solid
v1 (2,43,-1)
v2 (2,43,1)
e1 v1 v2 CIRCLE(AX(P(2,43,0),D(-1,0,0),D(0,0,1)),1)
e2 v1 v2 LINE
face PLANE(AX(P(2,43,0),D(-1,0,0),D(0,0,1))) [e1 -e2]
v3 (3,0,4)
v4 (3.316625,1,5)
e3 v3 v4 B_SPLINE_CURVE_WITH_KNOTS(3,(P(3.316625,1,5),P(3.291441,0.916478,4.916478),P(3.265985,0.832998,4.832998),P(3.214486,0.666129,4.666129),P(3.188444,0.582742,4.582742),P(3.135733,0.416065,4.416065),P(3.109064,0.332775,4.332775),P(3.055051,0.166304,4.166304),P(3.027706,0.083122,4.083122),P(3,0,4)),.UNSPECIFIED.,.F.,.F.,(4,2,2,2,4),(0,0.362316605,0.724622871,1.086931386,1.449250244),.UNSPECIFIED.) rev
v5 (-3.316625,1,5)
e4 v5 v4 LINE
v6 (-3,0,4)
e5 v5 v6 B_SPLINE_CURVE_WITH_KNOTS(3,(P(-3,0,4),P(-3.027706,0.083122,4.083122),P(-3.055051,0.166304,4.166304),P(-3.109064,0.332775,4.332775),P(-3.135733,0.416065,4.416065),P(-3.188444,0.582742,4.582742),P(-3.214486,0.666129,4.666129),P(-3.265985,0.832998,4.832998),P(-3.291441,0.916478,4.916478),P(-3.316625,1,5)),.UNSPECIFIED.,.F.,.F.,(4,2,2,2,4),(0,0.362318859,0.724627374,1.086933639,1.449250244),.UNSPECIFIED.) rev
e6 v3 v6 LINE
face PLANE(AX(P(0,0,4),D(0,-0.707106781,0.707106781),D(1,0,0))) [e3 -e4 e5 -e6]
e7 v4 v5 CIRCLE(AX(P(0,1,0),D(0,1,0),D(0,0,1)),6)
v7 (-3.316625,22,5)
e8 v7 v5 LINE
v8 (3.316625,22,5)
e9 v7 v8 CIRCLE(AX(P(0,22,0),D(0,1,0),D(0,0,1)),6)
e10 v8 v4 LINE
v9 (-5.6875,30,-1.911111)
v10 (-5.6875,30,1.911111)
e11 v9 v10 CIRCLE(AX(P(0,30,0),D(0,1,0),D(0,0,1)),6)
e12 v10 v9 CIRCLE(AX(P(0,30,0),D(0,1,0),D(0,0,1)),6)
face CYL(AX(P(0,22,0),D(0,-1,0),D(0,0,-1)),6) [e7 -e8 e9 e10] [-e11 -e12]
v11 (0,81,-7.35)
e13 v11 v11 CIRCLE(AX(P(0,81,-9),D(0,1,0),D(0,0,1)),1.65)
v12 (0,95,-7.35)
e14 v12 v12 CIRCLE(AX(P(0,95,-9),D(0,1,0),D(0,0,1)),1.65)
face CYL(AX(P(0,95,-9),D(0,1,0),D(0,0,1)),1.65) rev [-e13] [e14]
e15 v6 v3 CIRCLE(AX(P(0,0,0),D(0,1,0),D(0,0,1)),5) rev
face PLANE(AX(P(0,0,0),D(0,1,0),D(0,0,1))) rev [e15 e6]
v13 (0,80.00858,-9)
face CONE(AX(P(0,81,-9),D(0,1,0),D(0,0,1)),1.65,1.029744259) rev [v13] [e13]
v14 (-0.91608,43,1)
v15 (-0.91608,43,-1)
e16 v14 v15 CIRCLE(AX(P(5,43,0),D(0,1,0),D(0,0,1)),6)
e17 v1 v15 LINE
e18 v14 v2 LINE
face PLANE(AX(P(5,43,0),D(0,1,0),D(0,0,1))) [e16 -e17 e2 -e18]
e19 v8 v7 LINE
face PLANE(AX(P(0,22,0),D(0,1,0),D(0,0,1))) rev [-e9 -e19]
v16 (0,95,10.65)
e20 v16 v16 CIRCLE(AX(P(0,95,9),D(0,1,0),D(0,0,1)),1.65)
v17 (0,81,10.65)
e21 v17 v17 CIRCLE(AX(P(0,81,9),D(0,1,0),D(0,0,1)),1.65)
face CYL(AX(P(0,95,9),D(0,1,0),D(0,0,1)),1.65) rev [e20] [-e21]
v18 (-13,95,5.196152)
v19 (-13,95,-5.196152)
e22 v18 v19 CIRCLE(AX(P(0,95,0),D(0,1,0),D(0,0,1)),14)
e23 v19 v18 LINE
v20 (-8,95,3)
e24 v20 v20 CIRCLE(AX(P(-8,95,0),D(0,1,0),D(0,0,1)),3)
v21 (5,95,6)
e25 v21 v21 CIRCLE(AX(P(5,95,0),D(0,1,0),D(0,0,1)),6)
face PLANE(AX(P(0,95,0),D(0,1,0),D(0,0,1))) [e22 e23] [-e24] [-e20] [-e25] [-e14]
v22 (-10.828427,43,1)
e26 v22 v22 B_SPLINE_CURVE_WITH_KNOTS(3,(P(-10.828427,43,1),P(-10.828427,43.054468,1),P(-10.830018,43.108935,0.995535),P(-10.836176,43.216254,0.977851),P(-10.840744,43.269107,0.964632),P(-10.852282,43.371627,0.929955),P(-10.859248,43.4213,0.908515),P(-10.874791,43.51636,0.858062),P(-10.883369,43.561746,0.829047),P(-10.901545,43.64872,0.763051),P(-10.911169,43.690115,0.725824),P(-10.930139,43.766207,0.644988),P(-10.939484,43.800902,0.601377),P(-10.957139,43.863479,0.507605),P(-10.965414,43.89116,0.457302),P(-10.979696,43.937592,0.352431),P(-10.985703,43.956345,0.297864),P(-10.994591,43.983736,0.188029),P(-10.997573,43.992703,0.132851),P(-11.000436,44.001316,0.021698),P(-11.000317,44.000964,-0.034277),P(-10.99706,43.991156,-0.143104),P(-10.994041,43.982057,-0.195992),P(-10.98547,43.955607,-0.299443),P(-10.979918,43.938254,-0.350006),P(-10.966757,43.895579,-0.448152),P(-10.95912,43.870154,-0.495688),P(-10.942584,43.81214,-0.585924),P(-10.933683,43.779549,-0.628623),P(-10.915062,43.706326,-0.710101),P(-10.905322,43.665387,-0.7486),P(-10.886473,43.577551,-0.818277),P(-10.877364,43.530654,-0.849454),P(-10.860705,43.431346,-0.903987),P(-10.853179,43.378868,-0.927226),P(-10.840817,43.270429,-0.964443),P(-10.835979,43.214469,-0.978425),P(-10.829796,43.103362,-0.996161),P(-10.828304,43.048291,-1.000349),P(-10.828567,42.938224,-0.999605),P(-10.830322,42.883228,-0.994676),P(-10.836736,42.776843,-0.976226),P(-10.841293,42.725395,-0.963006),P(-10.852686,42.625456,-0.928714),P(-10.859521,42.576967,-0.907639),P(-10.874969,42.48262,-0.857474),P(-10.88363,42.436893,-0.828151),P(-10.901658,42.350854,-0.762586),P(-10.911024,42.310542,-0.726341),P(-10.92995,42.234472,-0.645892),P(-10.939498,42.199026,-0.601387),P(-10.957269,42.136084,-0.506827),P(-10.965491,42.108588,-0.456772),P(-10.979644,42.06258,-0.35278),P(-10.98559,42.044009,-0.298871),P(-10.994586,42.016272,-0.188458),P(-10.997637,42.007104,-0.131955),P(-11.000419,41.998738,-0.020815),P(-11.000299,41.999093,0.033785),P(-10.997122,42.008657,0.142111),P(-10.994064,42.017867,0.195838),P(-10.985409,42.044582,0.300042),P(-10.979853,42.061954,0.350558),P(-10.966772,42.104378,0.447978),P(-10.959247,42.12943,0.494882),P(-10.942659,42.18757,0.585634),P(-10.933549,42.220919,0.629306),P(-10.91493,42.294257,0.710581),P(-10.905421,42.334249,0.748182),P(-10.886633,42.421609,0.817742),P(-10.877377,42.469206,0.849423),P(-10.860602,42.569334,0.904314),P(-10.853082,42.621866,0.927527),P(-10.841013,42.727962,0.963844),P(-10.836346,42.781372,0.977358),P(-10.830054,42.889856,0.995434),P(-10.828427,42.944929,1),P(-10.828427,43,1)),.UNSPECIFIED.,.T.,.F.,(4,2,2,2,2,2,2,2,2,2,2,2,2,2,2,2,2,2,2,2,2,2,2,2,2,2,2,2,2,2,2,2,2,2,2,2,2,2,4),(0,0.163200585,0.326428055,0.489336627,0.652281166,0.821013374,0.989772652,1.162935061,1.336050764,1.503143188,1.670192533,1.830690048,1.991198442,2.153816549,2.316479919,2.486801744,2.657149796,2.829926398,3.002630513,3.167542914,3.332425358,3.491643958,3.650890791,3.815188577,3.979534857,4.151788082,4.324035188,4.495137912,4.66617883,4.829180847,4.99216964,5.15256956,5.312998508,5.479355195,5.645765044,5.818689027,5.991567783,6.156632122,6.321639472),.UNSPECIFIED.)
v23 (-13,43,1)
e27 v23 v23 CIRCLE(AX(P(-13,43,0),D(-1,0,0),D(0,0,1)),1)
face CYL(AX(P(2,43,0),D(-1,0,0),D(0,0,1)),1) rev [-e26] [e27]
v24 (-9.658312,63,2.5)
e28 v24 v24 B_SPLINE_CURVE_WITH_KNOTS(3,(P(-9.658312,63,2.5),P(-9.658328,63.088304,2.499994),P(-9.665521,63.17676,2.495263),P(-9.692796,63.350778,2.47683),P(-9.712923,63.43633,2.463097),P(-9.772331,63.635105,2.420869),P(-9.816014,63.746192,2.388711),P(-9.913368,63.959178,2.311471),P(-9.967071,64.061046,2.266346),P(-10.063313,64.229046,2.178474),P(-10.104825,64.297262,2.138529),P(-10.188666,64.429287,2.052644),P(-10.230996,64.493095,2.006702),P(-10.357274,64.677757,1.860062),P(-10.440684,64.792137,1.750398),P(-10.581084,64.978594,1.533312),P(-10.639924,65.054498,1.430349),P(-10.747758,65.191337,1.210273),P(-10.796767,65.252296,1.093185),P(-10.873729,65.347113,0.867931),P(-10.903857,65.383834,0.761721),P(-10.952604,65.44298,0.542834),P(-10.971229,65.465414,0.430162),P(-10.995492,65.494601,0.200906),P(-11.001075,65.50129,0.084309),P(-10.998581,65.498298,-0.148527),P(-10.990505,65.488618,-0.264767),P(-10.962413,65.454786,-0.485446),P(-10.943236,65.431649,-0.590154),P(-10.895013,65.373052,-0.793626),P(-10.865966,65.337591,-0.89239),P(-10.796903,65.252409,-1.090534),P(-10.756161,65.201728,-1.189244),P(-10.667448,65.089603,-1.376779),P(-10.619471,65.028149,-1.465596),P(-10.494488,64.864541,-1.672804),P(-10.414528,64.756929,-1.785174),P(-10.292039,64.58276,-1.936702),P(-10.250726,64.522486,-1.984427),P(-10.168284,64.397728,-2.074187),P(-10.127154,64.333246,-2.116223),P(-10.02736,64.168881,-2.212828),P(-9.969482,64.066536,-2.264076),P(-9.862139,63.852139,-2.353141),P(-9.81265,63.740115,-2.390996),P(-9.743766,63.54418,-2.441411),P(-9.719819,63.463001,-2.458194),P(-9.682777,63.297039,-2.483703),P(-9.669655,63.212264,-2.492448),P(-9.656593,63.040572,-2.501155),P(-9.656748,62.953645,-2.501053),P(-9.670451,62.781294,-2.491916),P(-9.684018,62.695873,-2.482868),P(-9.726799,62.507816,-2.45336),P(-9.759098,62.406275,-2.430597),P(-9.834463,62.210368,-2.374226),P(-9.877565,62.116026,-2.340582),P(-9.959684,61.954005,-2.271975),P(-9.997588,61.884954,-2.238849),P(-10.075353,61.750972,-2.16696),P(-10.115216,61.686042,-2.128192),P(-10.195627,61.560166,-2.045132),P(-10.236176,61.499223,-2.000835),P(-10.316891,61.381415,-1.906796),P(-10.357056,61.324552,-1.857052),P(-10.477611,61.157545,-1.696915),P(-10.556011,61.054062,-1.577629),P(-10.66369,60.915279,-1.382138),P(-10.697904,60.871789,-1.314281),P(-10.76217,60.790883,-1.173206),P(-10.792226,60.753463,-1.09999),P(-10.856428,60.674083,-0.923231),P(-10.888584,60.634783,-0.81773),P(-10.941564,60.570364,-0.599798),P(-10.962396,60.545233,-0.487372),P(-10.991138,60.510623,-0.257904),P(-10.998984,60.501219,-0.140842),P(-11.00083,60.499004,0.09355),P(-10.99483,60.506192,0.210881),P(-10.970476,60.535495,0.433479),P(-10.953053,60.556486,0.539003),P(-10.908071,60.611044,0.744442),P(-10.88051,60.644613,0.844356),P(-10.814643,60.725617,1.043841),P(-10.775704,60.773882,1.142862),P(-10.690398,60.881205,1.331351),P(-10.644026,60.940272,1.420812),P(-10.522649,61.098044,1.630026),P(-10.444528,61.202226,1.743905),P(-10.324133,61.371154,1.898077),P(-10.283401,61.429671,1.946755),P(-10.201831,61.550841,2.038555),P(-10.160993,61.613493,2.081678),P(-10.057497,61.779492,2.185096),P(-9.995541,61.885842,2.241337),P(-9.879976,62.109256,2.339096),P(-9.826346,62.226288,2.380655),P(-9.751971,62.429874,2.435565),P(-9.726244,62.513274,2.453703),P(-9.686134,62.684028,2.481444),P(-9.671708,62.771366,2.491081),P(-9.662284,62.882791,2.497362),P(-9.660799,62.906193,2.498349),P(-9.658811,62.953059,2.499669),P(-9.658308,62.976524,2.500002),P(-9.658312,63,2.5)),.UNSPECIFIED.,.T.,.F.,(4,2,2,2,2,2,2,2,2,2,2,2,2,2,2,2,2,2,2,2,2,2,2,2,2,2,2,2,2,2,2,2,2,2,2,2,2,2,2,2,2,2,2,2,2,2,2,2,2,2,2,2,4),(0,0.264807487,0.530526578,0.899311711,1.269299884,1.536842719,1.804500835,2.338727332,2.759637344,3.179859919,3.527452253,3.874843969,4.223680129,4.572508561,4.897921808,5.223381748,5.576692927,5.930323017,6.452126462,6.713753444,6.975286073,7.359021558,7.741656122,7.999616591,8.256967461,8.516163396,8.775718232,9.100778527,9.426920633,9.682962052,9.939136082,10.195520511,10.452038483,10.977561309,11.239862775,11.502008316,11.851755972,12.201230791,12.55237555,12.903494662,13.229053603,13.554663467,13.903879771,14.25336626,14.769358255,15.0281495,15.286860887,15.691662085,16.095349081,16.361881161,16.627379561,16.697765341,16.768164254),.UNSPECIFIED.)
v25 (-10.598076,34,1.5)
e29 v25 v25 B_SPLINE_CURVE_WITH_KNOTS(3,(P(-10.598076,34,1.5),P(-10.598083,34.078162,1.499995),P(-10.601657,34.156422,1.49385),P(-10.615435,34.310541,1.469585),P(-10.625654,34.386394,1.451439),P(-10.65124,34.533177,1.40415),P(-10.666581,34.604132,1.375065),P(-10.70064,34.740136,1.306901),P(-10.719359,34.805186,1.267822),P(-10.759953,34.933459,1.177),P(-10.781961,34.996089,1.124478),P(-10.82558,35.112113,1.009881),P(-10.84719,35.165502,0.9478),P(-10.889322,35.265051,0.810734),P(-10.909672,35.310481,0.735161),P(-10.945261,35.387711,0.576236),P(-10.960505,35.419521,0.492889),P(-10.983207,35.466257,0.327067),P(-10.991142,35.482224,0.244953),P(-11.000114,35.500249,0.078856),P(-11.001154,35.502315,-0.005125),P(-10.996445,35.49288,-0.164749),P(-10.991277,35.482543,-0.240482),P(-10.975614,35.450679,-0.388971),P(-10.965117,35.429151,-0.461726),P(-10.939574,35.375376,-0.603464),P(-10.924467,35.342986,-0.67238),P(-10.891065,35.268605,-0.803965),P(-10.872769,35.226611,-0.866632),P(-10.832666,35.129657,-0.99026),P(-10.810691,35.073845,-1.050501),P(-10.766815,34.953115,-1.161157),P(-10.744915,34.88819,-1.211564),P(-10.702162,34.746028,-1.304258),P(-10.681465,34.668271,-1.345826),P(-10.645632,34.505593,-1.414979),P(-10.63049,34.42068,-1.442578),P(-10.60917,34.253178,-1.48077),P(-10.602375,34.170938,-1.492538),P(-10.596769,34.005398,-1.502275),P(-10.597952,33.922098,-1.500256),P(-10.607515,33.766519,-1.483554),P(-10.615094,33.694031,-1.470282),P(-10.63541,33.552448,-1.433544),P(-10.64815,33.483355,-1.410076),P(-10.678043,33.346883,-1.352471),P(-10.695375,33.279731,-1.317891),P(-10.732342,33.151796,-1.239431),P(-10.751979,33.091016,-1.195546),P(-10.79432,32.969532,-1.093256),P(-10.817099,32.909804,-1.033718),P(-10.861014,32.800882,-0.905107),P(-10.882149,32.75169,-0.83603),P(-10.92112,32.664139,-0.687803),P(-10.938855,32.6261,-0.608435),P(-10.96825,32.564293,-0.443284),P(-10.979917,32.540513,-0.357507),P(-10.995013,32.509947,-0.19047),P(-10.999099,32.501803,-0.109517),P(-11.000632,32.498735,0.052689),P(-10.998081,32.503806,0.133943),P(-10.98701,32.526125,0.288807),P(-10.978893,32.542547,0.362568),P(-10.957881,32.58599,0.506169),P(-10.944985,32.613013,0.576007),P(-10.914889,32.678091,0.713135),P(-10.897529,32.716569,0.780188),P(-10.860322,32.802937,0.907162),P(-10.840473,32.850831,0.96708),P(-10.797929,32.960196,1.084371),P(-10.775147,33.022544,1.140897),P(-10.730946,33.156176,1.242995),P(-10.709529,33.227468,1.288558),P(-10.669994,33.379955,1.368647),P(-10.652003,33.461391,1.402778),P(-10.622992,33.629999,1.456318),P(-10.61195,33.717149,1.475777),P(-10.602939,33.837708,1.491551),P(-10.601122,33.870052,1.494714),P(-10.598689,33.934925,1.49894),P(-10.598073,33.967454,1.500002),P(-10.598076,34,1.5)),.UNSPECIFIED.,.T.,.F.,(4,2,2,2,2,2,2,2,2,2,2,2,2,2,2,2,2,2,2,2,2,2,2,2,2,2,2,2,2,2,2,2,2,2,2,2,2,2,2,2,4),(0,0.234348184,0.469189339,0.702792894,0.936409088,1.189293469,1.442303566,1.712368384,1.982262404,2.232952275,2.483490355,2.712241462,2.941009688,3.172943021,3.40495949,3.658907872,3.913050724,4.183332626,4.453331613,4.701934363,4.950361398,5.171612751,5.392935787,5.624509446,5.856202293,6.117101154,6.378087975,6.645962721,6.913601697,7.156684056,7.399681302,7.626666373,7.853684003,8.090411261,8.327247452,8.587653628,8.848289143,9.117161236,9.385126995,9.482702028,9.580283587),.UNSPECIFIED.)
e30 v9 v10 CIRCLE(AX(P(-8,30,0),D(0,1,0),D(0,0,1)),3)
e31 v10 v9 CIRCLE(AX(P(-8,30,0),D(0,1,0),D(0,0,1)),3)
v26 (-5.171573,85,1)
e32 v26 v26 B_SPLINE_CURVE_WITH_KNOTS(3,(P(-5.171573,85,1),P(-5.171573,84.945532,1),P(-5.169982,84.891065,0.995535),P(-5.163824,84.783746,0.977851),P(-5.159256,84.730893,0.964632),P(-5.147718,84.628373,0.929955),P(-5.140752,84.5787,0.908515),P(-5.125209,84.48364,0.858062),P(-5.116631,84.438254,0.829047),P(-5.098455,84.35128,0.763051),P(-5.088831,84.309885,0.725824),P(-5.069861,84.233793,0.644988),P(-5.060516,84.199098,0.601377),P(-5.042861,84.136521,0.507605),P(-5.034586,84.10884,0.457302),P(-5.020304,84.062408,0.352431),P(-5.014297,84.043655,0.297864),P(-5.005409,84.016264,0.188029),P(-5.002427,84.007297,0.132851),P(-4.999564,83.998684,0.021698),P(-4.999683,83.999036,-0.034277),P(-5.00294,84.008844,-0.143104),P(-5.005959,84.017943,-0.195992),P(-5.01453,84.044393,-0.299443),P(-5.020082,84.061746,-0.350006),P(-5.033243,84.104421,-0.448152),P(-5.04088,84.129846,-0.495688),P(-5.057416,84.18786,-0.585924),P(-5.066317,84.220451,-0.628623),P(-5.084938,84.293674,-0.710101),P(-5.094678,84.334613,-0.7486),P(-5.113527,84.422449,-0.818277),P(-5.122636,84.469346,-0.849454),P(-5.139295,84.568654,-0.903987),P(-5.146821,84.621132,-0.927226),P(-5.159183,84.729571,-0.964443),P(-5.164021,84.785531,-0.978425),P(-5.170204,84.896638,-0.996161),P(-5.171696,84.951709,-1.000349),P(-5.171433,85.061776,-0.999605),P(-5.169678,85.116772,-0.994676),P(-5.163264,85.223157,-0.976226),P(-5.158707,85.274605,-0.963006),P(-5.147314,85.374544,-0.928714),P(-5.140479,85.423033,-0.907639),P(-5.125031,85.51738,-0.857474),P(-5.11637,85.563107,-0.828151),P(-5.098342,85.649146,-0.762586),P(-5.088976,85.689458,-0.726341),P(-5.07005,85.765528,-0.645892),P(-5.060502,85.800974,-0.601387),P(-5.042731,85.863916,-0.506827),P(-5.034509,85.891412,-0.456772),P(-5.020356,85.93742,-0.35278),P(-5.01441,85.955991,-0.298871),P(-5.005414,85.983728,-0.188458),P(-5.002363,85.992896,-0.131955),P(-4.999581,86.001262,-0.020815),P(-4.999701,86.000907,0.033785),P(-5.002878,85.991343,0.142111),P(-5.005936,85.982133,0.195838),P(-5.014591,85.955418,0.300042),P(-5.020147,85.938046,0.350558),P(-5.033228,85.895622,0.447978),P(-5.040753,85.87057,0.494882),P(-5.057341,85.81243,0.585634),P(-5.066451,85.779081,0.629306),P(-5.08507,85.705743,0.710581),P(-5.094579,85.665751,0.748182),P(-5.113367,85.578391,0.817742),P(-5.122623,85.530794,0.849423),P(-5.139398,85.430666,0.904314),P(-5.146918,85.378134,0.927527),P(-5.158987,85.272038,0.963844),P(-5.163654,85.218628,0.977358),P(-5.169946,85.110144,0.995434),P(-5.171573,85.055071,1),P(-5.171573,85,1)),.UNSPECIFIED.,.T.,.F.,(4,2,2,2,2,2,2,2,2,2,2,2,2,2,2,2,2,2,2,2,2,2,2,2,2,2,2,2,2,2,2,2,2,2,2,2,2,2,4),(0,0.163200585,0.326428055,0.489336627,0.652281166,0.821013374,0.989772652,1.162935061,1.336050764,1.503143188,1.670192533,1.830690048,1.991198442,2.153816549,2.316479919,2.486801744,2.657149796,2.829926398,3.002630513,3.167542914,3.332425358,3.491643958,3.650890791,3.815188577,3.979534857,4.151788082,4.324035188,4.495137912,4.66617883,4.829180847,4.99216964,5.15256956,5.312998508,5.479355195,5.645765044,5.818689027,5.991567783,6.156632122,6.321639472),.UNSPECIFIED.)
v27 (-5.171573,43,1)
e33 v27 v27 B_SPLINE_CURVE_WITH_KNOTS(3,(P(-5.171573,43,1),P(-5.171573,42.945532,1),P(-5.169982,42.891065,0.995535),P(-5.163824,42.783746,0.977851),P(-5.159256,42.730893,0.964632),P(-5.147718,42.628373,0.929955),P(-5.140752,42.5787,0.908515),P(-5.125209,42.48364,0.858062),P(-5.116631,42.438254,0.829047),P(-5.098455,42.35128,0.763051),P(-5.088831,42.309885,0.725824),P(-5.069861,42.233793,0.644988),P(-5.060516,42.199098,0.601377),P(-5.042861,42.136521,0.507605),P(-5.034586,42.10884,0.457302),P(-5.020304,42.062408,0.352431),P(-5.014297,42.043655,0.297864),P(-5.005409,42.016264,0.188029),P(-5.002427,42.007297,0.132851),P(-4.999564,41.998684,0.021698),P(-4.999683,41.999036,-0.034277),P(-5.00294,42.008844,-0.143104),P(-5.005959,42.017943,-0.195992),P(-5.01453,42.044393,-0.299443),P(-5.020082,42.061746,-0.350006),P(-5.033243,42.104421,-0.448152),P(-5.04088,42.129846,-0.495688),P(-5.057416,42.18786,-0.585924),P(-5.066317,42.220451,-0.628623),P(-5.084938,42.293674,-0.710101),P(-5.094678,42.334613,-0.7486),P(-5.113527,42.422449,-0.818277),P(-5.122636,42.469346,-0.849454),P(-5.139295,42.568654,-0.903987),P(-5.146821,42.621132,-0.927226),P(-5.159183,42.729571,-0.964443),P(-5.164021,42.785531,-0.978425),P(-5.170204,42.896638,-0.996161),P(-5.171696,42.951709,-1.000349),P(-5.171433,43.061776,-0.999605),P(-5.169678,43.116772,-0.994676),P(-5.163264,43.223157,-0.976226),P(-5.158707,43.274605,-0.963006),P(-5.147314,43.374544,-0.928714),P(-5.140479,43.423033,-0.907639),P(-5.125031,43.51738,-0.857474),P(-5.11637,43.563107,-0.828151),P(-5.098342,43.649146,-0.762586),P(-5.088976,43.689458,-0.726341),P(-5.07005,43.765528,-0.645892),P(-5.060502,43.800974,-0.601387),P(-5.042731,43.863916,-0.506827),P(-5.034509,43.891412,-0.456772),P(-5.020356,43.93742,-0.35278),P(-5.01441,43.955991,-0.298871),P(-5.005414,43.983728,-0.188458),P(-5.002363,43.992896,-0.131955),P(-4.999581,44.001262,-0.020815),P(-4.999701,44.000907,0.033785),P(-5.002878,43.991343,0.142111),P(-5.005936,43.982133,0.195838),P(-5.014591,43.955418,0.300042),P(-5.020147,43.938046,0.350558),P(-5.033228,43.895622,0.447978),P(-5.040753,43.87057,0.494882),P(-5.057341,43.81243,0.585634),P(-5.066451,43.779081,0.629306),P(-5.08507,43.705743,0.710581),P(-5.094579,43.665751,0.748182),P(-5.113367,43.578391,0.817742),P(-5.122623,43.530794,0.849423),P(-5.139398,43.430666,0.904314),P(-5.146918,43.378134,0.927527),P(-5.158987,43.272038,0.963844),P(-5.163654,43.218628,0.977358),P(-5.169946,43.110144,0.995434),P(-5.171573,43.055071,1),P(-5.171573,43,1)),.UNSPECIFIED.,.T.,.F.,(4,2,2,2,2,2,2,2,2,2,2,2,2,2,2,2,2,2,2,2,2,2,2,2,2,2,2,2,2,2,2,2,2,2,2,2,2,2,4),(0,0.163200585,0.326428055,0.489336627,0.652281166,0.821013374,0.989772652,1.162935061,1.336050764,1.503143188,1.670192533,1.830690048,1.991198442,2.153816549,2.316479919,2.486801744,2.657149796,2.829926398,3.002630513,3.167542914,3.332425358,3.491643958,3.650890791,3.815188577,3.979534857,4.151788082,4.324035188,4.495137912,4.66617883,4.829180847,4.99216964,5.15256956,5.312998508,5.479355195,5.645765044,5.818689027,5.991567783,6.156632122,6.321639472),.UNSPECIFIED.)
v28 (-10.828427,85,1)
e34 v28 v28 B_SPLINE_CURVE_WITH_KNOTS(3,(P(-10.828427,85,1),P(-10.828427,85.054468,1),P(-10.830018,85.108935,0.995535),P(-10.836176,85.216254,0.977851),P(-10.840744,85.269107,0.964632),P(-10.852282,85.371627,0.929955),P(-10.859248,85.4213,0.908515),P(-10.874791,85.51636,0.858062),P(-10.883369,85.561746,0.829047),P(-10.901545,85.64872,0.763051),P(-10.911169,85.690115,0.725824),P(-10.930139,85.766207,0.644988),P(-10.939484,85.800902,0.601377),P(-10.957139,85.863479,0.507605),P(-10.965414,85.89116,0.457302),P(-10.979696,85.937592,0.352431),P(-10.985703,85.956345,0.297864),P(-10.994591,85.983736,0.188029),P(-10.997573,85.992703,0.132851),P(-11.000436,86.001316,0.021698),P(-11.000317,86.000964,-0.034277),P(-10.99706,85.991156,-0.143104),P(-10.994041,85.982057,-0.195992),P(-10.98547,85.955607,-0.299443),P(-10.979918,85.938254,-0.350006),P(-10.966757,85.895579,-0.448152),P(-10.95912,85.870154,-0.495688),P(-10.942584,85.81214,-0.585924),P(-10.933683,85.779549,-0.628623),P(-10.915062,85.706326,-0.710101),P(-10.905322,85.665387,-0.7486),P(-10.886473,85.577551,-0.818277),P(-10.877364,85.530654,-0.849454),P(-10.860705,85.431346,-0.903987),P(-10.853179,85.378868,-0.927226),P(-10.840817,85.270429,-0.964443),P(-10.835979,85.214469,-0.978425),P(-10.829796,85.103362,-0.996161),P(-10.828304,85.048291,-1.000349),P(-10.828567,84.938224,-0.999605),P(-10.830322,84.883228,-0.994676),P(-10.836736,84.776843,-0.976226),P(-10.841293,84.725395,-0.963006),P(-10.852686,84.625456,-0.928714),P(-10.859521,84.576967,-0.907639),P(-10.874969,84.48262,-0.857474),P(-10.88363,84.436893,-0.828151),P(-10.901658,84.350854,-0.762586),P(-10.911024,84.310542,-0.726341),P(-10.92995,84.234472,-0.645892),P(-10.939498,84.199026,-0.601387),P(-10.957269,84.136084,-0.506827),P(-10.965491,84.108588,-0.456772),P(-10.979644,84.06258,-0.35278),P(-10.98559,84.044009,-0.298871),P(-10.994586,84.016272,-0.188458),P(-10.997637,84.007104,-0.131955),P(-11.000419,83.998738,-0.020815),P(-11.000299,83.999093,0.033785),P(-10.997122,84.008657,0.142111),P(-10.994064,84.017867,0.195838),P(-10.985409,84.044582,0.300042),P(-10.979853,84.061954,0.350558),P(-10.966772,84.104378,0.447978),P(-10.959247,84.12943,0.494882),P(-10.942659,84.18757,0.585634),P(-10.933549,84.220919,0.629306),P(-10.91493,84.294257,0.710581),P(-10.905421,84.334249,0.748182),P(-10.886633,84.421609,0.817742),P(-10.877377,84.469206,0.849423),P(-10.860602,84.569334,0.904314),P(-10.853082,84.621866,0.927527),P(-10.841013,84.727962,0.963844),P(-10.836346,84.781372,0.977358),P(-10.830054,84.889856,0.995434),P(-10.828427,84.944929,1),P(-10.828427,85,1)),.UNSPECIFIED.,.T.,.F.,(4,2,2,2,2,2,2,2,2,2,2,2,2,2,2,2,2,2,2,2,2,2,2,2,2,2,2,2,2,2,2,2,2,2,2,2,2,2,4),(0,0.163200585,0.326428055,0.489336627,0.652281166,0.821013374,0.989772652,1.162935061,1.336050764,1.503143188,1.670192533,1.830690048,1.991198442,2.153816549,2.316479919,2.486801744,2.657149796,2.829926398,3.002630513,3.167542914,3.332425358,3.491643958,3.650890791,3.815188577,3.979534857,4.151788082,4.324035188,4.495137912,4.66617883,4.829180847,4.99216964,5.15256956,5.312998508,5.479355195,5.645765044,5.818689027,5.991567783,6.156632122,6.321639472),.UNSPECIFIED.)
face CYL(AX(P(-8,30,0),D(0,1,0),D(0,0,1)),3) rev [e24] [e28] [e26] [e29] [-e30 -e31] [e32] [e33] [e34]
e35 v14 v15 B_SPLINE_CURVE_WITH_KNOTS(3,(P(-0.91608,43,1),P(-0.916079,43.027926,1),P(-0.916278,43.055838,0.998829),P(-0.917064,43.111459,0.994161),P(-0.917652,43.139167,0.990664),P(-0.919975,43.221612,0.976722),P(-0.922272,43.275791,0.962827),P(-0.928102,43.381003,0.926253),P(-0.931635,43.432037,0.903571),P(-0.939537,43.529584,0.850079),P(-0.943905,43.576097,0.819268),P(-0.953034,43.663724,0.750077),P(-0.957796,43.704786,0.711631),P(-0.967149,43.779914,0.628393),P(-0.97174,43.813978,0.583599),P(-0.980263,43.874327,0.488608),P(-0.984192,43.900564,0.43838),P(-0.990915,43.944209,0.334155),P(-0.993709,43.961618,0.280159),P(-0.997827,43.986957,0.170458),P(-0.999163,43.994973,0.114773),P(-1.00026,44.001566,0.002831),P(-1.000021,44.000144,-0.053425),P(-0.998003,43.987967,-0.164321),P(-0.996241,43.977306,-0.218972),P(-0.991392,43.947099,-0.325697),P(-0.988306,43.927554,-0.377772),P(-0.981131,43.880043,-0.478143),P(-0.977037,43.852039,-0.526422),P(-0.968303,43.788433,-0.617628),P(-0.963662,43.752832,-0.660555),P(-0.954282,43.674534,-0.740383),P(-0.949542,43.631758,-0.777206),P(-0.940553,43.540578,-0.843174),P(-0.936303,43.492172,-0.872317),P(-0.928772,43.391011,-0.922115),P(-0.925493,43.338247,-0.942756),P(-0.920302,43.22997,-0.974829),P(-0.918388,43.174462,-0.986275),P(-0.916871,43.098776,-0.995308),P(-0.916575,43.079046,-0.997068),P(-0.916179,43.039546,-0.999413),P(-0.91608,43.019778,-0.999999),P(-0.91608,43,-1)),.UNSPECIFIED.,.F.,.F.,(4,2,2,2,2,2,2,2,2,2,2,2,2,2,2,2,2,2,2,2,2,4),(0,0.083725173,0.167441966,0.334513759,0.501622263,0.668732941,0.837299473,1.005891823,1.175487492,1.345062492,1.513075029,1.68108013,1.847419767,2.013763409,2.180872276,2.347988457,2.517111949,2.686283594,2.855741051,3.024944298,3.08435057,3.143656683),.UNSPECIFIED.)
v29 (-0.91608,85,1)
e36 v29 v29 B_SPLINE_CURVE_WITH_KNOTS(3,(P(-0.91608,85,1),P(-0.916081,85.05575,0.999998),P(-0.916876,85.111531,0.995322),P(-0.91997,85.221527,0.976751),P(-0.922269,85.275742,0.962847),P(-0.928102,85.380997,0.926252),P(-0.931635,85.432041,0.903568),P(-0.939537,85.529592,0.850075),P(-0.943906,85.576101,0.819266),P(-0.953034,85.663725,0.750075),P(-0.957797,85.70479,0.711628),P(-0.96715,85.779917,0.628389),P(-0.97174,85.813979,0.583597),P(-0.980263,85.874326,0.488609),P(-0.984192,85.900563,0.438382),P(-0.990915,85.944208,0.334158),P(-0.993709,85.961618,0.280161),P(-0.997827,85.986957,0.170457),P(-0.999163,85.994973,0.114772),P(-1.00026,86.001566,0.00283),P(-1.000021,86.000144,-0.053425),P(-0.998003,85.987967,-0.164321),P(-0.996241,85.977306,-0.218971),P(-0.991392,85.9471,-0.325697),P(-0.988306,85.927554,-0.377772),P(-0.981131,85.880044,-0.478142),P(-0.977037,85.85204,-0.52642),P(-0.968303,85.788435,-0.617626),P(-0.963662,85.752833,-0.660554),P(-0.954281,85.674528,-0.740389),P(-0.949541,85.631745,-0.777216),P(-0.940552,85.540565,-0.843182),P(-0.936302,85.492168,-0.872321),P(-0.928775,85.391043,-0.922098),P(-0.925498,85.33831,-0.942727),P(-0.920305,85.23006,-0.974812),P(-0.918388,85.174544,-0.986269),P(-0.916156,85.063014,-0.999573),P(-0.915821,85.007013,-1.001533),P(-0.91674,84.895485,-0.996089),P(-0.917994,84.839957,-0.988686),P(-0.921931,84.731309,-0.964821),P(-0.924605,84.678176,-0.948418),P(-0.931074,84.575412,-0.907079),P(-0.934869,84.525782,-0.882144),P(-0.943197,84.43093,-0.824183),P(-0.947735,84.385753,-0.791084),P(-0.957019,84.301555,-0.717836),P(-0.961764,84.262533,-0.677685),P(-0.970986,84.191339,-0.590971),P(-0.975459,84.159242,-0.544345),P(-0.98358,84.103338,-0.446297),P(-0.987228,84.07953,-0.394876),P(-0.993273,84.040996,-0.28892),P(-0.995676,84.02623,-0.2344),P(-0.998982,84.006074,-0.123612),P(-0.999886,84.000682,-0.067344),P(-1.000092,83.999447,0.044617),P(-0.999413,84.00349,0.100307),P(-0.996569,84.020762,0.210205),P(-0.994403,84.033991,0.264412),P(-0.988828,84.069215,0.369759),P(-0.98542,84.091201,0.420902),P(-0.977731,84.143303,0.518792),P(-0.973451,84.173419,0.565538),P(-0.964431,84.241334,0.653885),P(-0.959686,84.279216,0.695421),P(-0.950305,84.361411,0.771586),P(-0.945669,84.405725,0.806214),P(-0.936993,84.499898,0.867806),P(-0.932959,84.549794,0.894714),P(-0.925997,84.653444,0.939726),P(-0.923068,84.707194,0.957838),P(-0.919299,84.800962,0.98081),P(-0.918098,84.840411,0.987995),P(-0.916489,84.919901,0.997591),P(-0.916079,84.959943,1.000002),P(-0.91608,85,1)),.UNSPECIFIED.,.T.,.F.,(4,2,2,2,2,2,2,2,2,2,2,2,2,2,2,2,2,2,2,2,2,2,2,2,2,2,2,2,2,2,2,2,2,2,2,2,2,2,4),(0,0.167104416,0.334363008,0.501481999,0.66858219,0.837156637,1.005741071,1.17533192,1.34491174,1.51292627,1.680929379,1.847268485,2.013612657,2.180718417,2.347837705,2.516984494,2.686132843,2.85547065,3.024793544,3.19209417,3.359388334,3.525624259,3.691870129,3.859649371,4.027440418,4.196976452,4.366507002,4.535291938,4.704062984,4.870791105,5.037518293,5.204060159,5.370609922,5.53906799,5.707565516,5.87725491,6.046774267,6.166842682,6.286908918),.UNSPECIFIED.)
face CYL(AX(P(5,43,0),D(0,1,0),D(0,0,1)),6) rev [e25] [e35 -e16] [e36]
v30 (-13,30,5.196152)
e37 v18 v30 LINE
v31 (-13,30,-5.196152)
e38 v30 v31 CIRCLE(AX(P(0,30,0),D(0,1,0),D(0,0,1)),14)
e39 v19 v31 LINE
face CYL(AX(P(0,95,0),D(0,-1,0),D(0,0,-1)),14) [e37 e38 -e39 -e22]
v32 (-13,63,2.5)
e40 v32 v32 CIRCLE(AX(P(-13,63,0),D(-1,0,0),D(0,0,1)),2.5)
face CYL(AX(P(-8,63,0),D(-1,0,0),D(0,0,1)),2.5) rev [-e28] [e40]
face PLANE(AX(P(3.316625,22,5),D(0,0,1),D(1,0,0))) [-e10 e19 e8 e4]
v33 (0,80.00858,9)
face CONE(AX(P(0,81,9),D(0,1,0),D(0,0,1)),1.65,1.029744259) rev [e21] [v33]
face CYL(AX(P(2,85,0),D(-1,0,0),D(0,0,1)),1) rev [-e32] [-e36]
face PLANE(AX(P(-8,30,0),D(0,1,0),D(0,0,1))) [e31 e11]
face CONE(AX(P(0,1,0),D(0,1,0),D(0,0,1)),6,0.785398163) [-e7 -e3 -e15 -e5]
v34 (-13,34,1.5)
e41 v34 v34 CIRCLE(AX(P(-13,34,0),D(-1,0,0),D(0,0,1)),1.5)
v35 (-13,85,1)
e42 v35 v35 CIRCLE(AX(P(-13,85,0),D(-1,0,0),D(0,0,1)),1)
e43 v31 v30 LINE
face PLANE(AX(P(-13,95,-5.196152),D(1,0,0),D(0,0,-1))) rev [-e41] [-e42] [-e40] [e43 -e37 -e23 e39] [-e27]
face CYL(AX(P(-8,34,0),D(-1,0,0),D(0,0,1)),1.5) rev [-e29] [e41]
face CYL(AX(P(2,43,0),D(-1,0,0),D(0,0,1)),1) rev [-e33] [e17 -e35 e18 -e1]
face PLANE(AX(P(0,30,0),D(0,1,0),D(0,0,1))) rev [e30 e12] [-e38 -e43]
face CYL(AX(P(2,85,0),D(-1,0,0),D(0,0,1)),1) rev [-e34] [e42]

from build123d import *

# Parameters (mm, degrees)
BOSS_EXTRUDE2_DEPTH   = 22
SKETCH6_R             = 6
BOSS_EXTRUDE3_DEPTH   = 8
BOSS_EXTRUDE4_DEPTH   = 65
SKETCH8_R             = 3
CUT_EXTRUDE5_DEPTH    = 65
SKETCH9_R             = 6
CUT_EXTRUDE6_DEPTH    = 52
M4_TAPPED_HOLE1_D     = 3.3
M4_TAPPED_HOLE1_DEPTH = 14
M4_TAPPED_HOLE1_TIP   = 0.991420021
SKETCH13_R            = 1.5
SKETCH13_R_2          = 2.5
CUT_EXTRUDE7_DEPTH    = 5
SKETCH14_R            = 1
CUT_EXTRUDE8_DEPTH    = 15
CHAMFER1_SIZE         = 1


with BuildPart() as part:
    # Sketch2 → Boss-Extrude2 (new body)
    with BuildSketch(Plane(origin=(0, 0, 0), x_dir=(1, 0, 0), z_dir=(0, 1, 0))):
        with BuildLine():
            Line((3.31662479, -5), (-3.31662479, -5))
            ThreePointArc((-3.31662479, -5), (0, 6), (3.31662479, -5))
        make_face()
    extrude(amount=BOSS_EXTRUDE2_DEPTH)

    # Sketch6 → Boss-Extrude3 (add)
    with BuildSketch(Plane(origin=(0, 22, 0), x_dir=(1, 0, 0), z_dir=(0, 1, 0))):
        with Locations(Location((0, 0, 0), (0, 0, 236.442690238))):
            Circle(SKETCH6_R)
    extrude(amount=BOSS_EXTRUDE3_DEPTH)

    # Sketch7 → Boss-Extrude4 (add)
    with BuildSketch(Plane(origin=(0, 30, 0), x_dir=(1, 0, 0), z_dir=(0, 1, 0))):
        with BuildLine():
            Line((-13, 5.196152423), (-13, -5.196152423))
            ThreePointArc((-13, -5.196152423), (14, 0), (-13, 5.196152423))
        make_face()
    extrude(amount=BOSS_EXTRUDE4_DEPTH)

    # Sketch8 → Cut-Extrude5 (cut)
    with BuildSketch(Plane(origin=(0, 95, 0), x_dir=(1, 0, 0), z_dir=(0, 1, 0))):
        with Locations(Location((-8, 0, 0), (0, 0, 270))):
            Circle(SKETCH8_R)
    extrude(amount=-CUT_EXTRUDE5_DEPTH, mode=Mode.SUBTRACT)

    # Sketch9 → Cut-Extrude6 (cut)
    with BuildSketch(Plane(origin=(0, 95, 0), x_dir=(1, 0, 0), z_dir=(0, 1, 0))):
        with Locations(Location((5, 0, 0), (0, 0, 270))):
            Circle(SKETCH9_R)
    extrude(amount=-CUT_EXTRUDE6_DEPTH, mode=Mode.SUBTRACT)

    # M4 Tapped Hole1
    with Locations(Plane(origin=(0, 95, -9), x_dir=(0, 0, 1), z_dir=(0, 1, 0))):
        with Locations((0, 0), (18, 0)):
            Hole(M4_TAPPED_HOLE1_D / 2, depth=M4_TAPPED_HOLE1_DEPTH)
            with Locations((0, 0, -(M4_TAPPED_HOLE1_DEPTH + M4_TAPPED_HOLE1_TIP / 2))):  # 118° drill point
                Cone(0, M4_TAPPED_HOLE1_D / 2, M4_TAPPED_HOLE1_TIP, mode=Mode.SUBTRACT)

    # Sketch13 → Cut-Extrude7 (cut)
    with BuildSketch(Plane.ZY.offset(13)):
        with Locations((0, 34)):
            Circle(SKETCH13_R)
        with Locations((0, 63)):
            Circle(SKETCH13_R_2)
    extrude(amount=-CUT_EXTRUDE7_DEPTH, mode=Mode.SUBTRACT)

    # Sketch14 → Cut-Extrude8 (cut)
    with BuildSketch(Plane.ZY.offset(13)):
        with Locations((0, 85)):
            Circle(SKETCH14_R)
        with Locations((0, 43)):
            Circle(SKETCH14_R)
    extrude(amount=-CUT_EXTRUDE8_DEPTH, mode=Mode.SUBTRACT)

    # Chamfer1
    chamfer1_edges = [part.edges().sort_by_distance(p)[0] for p in [
        (0, 0, 5),
        (0, 0, -6),
    ]]
    chamfer(chamfer1_edges, length=CHAMFER1_SIZE - 0.0001)  # a hair under: the kernel refuses the full size


solid = part.part
